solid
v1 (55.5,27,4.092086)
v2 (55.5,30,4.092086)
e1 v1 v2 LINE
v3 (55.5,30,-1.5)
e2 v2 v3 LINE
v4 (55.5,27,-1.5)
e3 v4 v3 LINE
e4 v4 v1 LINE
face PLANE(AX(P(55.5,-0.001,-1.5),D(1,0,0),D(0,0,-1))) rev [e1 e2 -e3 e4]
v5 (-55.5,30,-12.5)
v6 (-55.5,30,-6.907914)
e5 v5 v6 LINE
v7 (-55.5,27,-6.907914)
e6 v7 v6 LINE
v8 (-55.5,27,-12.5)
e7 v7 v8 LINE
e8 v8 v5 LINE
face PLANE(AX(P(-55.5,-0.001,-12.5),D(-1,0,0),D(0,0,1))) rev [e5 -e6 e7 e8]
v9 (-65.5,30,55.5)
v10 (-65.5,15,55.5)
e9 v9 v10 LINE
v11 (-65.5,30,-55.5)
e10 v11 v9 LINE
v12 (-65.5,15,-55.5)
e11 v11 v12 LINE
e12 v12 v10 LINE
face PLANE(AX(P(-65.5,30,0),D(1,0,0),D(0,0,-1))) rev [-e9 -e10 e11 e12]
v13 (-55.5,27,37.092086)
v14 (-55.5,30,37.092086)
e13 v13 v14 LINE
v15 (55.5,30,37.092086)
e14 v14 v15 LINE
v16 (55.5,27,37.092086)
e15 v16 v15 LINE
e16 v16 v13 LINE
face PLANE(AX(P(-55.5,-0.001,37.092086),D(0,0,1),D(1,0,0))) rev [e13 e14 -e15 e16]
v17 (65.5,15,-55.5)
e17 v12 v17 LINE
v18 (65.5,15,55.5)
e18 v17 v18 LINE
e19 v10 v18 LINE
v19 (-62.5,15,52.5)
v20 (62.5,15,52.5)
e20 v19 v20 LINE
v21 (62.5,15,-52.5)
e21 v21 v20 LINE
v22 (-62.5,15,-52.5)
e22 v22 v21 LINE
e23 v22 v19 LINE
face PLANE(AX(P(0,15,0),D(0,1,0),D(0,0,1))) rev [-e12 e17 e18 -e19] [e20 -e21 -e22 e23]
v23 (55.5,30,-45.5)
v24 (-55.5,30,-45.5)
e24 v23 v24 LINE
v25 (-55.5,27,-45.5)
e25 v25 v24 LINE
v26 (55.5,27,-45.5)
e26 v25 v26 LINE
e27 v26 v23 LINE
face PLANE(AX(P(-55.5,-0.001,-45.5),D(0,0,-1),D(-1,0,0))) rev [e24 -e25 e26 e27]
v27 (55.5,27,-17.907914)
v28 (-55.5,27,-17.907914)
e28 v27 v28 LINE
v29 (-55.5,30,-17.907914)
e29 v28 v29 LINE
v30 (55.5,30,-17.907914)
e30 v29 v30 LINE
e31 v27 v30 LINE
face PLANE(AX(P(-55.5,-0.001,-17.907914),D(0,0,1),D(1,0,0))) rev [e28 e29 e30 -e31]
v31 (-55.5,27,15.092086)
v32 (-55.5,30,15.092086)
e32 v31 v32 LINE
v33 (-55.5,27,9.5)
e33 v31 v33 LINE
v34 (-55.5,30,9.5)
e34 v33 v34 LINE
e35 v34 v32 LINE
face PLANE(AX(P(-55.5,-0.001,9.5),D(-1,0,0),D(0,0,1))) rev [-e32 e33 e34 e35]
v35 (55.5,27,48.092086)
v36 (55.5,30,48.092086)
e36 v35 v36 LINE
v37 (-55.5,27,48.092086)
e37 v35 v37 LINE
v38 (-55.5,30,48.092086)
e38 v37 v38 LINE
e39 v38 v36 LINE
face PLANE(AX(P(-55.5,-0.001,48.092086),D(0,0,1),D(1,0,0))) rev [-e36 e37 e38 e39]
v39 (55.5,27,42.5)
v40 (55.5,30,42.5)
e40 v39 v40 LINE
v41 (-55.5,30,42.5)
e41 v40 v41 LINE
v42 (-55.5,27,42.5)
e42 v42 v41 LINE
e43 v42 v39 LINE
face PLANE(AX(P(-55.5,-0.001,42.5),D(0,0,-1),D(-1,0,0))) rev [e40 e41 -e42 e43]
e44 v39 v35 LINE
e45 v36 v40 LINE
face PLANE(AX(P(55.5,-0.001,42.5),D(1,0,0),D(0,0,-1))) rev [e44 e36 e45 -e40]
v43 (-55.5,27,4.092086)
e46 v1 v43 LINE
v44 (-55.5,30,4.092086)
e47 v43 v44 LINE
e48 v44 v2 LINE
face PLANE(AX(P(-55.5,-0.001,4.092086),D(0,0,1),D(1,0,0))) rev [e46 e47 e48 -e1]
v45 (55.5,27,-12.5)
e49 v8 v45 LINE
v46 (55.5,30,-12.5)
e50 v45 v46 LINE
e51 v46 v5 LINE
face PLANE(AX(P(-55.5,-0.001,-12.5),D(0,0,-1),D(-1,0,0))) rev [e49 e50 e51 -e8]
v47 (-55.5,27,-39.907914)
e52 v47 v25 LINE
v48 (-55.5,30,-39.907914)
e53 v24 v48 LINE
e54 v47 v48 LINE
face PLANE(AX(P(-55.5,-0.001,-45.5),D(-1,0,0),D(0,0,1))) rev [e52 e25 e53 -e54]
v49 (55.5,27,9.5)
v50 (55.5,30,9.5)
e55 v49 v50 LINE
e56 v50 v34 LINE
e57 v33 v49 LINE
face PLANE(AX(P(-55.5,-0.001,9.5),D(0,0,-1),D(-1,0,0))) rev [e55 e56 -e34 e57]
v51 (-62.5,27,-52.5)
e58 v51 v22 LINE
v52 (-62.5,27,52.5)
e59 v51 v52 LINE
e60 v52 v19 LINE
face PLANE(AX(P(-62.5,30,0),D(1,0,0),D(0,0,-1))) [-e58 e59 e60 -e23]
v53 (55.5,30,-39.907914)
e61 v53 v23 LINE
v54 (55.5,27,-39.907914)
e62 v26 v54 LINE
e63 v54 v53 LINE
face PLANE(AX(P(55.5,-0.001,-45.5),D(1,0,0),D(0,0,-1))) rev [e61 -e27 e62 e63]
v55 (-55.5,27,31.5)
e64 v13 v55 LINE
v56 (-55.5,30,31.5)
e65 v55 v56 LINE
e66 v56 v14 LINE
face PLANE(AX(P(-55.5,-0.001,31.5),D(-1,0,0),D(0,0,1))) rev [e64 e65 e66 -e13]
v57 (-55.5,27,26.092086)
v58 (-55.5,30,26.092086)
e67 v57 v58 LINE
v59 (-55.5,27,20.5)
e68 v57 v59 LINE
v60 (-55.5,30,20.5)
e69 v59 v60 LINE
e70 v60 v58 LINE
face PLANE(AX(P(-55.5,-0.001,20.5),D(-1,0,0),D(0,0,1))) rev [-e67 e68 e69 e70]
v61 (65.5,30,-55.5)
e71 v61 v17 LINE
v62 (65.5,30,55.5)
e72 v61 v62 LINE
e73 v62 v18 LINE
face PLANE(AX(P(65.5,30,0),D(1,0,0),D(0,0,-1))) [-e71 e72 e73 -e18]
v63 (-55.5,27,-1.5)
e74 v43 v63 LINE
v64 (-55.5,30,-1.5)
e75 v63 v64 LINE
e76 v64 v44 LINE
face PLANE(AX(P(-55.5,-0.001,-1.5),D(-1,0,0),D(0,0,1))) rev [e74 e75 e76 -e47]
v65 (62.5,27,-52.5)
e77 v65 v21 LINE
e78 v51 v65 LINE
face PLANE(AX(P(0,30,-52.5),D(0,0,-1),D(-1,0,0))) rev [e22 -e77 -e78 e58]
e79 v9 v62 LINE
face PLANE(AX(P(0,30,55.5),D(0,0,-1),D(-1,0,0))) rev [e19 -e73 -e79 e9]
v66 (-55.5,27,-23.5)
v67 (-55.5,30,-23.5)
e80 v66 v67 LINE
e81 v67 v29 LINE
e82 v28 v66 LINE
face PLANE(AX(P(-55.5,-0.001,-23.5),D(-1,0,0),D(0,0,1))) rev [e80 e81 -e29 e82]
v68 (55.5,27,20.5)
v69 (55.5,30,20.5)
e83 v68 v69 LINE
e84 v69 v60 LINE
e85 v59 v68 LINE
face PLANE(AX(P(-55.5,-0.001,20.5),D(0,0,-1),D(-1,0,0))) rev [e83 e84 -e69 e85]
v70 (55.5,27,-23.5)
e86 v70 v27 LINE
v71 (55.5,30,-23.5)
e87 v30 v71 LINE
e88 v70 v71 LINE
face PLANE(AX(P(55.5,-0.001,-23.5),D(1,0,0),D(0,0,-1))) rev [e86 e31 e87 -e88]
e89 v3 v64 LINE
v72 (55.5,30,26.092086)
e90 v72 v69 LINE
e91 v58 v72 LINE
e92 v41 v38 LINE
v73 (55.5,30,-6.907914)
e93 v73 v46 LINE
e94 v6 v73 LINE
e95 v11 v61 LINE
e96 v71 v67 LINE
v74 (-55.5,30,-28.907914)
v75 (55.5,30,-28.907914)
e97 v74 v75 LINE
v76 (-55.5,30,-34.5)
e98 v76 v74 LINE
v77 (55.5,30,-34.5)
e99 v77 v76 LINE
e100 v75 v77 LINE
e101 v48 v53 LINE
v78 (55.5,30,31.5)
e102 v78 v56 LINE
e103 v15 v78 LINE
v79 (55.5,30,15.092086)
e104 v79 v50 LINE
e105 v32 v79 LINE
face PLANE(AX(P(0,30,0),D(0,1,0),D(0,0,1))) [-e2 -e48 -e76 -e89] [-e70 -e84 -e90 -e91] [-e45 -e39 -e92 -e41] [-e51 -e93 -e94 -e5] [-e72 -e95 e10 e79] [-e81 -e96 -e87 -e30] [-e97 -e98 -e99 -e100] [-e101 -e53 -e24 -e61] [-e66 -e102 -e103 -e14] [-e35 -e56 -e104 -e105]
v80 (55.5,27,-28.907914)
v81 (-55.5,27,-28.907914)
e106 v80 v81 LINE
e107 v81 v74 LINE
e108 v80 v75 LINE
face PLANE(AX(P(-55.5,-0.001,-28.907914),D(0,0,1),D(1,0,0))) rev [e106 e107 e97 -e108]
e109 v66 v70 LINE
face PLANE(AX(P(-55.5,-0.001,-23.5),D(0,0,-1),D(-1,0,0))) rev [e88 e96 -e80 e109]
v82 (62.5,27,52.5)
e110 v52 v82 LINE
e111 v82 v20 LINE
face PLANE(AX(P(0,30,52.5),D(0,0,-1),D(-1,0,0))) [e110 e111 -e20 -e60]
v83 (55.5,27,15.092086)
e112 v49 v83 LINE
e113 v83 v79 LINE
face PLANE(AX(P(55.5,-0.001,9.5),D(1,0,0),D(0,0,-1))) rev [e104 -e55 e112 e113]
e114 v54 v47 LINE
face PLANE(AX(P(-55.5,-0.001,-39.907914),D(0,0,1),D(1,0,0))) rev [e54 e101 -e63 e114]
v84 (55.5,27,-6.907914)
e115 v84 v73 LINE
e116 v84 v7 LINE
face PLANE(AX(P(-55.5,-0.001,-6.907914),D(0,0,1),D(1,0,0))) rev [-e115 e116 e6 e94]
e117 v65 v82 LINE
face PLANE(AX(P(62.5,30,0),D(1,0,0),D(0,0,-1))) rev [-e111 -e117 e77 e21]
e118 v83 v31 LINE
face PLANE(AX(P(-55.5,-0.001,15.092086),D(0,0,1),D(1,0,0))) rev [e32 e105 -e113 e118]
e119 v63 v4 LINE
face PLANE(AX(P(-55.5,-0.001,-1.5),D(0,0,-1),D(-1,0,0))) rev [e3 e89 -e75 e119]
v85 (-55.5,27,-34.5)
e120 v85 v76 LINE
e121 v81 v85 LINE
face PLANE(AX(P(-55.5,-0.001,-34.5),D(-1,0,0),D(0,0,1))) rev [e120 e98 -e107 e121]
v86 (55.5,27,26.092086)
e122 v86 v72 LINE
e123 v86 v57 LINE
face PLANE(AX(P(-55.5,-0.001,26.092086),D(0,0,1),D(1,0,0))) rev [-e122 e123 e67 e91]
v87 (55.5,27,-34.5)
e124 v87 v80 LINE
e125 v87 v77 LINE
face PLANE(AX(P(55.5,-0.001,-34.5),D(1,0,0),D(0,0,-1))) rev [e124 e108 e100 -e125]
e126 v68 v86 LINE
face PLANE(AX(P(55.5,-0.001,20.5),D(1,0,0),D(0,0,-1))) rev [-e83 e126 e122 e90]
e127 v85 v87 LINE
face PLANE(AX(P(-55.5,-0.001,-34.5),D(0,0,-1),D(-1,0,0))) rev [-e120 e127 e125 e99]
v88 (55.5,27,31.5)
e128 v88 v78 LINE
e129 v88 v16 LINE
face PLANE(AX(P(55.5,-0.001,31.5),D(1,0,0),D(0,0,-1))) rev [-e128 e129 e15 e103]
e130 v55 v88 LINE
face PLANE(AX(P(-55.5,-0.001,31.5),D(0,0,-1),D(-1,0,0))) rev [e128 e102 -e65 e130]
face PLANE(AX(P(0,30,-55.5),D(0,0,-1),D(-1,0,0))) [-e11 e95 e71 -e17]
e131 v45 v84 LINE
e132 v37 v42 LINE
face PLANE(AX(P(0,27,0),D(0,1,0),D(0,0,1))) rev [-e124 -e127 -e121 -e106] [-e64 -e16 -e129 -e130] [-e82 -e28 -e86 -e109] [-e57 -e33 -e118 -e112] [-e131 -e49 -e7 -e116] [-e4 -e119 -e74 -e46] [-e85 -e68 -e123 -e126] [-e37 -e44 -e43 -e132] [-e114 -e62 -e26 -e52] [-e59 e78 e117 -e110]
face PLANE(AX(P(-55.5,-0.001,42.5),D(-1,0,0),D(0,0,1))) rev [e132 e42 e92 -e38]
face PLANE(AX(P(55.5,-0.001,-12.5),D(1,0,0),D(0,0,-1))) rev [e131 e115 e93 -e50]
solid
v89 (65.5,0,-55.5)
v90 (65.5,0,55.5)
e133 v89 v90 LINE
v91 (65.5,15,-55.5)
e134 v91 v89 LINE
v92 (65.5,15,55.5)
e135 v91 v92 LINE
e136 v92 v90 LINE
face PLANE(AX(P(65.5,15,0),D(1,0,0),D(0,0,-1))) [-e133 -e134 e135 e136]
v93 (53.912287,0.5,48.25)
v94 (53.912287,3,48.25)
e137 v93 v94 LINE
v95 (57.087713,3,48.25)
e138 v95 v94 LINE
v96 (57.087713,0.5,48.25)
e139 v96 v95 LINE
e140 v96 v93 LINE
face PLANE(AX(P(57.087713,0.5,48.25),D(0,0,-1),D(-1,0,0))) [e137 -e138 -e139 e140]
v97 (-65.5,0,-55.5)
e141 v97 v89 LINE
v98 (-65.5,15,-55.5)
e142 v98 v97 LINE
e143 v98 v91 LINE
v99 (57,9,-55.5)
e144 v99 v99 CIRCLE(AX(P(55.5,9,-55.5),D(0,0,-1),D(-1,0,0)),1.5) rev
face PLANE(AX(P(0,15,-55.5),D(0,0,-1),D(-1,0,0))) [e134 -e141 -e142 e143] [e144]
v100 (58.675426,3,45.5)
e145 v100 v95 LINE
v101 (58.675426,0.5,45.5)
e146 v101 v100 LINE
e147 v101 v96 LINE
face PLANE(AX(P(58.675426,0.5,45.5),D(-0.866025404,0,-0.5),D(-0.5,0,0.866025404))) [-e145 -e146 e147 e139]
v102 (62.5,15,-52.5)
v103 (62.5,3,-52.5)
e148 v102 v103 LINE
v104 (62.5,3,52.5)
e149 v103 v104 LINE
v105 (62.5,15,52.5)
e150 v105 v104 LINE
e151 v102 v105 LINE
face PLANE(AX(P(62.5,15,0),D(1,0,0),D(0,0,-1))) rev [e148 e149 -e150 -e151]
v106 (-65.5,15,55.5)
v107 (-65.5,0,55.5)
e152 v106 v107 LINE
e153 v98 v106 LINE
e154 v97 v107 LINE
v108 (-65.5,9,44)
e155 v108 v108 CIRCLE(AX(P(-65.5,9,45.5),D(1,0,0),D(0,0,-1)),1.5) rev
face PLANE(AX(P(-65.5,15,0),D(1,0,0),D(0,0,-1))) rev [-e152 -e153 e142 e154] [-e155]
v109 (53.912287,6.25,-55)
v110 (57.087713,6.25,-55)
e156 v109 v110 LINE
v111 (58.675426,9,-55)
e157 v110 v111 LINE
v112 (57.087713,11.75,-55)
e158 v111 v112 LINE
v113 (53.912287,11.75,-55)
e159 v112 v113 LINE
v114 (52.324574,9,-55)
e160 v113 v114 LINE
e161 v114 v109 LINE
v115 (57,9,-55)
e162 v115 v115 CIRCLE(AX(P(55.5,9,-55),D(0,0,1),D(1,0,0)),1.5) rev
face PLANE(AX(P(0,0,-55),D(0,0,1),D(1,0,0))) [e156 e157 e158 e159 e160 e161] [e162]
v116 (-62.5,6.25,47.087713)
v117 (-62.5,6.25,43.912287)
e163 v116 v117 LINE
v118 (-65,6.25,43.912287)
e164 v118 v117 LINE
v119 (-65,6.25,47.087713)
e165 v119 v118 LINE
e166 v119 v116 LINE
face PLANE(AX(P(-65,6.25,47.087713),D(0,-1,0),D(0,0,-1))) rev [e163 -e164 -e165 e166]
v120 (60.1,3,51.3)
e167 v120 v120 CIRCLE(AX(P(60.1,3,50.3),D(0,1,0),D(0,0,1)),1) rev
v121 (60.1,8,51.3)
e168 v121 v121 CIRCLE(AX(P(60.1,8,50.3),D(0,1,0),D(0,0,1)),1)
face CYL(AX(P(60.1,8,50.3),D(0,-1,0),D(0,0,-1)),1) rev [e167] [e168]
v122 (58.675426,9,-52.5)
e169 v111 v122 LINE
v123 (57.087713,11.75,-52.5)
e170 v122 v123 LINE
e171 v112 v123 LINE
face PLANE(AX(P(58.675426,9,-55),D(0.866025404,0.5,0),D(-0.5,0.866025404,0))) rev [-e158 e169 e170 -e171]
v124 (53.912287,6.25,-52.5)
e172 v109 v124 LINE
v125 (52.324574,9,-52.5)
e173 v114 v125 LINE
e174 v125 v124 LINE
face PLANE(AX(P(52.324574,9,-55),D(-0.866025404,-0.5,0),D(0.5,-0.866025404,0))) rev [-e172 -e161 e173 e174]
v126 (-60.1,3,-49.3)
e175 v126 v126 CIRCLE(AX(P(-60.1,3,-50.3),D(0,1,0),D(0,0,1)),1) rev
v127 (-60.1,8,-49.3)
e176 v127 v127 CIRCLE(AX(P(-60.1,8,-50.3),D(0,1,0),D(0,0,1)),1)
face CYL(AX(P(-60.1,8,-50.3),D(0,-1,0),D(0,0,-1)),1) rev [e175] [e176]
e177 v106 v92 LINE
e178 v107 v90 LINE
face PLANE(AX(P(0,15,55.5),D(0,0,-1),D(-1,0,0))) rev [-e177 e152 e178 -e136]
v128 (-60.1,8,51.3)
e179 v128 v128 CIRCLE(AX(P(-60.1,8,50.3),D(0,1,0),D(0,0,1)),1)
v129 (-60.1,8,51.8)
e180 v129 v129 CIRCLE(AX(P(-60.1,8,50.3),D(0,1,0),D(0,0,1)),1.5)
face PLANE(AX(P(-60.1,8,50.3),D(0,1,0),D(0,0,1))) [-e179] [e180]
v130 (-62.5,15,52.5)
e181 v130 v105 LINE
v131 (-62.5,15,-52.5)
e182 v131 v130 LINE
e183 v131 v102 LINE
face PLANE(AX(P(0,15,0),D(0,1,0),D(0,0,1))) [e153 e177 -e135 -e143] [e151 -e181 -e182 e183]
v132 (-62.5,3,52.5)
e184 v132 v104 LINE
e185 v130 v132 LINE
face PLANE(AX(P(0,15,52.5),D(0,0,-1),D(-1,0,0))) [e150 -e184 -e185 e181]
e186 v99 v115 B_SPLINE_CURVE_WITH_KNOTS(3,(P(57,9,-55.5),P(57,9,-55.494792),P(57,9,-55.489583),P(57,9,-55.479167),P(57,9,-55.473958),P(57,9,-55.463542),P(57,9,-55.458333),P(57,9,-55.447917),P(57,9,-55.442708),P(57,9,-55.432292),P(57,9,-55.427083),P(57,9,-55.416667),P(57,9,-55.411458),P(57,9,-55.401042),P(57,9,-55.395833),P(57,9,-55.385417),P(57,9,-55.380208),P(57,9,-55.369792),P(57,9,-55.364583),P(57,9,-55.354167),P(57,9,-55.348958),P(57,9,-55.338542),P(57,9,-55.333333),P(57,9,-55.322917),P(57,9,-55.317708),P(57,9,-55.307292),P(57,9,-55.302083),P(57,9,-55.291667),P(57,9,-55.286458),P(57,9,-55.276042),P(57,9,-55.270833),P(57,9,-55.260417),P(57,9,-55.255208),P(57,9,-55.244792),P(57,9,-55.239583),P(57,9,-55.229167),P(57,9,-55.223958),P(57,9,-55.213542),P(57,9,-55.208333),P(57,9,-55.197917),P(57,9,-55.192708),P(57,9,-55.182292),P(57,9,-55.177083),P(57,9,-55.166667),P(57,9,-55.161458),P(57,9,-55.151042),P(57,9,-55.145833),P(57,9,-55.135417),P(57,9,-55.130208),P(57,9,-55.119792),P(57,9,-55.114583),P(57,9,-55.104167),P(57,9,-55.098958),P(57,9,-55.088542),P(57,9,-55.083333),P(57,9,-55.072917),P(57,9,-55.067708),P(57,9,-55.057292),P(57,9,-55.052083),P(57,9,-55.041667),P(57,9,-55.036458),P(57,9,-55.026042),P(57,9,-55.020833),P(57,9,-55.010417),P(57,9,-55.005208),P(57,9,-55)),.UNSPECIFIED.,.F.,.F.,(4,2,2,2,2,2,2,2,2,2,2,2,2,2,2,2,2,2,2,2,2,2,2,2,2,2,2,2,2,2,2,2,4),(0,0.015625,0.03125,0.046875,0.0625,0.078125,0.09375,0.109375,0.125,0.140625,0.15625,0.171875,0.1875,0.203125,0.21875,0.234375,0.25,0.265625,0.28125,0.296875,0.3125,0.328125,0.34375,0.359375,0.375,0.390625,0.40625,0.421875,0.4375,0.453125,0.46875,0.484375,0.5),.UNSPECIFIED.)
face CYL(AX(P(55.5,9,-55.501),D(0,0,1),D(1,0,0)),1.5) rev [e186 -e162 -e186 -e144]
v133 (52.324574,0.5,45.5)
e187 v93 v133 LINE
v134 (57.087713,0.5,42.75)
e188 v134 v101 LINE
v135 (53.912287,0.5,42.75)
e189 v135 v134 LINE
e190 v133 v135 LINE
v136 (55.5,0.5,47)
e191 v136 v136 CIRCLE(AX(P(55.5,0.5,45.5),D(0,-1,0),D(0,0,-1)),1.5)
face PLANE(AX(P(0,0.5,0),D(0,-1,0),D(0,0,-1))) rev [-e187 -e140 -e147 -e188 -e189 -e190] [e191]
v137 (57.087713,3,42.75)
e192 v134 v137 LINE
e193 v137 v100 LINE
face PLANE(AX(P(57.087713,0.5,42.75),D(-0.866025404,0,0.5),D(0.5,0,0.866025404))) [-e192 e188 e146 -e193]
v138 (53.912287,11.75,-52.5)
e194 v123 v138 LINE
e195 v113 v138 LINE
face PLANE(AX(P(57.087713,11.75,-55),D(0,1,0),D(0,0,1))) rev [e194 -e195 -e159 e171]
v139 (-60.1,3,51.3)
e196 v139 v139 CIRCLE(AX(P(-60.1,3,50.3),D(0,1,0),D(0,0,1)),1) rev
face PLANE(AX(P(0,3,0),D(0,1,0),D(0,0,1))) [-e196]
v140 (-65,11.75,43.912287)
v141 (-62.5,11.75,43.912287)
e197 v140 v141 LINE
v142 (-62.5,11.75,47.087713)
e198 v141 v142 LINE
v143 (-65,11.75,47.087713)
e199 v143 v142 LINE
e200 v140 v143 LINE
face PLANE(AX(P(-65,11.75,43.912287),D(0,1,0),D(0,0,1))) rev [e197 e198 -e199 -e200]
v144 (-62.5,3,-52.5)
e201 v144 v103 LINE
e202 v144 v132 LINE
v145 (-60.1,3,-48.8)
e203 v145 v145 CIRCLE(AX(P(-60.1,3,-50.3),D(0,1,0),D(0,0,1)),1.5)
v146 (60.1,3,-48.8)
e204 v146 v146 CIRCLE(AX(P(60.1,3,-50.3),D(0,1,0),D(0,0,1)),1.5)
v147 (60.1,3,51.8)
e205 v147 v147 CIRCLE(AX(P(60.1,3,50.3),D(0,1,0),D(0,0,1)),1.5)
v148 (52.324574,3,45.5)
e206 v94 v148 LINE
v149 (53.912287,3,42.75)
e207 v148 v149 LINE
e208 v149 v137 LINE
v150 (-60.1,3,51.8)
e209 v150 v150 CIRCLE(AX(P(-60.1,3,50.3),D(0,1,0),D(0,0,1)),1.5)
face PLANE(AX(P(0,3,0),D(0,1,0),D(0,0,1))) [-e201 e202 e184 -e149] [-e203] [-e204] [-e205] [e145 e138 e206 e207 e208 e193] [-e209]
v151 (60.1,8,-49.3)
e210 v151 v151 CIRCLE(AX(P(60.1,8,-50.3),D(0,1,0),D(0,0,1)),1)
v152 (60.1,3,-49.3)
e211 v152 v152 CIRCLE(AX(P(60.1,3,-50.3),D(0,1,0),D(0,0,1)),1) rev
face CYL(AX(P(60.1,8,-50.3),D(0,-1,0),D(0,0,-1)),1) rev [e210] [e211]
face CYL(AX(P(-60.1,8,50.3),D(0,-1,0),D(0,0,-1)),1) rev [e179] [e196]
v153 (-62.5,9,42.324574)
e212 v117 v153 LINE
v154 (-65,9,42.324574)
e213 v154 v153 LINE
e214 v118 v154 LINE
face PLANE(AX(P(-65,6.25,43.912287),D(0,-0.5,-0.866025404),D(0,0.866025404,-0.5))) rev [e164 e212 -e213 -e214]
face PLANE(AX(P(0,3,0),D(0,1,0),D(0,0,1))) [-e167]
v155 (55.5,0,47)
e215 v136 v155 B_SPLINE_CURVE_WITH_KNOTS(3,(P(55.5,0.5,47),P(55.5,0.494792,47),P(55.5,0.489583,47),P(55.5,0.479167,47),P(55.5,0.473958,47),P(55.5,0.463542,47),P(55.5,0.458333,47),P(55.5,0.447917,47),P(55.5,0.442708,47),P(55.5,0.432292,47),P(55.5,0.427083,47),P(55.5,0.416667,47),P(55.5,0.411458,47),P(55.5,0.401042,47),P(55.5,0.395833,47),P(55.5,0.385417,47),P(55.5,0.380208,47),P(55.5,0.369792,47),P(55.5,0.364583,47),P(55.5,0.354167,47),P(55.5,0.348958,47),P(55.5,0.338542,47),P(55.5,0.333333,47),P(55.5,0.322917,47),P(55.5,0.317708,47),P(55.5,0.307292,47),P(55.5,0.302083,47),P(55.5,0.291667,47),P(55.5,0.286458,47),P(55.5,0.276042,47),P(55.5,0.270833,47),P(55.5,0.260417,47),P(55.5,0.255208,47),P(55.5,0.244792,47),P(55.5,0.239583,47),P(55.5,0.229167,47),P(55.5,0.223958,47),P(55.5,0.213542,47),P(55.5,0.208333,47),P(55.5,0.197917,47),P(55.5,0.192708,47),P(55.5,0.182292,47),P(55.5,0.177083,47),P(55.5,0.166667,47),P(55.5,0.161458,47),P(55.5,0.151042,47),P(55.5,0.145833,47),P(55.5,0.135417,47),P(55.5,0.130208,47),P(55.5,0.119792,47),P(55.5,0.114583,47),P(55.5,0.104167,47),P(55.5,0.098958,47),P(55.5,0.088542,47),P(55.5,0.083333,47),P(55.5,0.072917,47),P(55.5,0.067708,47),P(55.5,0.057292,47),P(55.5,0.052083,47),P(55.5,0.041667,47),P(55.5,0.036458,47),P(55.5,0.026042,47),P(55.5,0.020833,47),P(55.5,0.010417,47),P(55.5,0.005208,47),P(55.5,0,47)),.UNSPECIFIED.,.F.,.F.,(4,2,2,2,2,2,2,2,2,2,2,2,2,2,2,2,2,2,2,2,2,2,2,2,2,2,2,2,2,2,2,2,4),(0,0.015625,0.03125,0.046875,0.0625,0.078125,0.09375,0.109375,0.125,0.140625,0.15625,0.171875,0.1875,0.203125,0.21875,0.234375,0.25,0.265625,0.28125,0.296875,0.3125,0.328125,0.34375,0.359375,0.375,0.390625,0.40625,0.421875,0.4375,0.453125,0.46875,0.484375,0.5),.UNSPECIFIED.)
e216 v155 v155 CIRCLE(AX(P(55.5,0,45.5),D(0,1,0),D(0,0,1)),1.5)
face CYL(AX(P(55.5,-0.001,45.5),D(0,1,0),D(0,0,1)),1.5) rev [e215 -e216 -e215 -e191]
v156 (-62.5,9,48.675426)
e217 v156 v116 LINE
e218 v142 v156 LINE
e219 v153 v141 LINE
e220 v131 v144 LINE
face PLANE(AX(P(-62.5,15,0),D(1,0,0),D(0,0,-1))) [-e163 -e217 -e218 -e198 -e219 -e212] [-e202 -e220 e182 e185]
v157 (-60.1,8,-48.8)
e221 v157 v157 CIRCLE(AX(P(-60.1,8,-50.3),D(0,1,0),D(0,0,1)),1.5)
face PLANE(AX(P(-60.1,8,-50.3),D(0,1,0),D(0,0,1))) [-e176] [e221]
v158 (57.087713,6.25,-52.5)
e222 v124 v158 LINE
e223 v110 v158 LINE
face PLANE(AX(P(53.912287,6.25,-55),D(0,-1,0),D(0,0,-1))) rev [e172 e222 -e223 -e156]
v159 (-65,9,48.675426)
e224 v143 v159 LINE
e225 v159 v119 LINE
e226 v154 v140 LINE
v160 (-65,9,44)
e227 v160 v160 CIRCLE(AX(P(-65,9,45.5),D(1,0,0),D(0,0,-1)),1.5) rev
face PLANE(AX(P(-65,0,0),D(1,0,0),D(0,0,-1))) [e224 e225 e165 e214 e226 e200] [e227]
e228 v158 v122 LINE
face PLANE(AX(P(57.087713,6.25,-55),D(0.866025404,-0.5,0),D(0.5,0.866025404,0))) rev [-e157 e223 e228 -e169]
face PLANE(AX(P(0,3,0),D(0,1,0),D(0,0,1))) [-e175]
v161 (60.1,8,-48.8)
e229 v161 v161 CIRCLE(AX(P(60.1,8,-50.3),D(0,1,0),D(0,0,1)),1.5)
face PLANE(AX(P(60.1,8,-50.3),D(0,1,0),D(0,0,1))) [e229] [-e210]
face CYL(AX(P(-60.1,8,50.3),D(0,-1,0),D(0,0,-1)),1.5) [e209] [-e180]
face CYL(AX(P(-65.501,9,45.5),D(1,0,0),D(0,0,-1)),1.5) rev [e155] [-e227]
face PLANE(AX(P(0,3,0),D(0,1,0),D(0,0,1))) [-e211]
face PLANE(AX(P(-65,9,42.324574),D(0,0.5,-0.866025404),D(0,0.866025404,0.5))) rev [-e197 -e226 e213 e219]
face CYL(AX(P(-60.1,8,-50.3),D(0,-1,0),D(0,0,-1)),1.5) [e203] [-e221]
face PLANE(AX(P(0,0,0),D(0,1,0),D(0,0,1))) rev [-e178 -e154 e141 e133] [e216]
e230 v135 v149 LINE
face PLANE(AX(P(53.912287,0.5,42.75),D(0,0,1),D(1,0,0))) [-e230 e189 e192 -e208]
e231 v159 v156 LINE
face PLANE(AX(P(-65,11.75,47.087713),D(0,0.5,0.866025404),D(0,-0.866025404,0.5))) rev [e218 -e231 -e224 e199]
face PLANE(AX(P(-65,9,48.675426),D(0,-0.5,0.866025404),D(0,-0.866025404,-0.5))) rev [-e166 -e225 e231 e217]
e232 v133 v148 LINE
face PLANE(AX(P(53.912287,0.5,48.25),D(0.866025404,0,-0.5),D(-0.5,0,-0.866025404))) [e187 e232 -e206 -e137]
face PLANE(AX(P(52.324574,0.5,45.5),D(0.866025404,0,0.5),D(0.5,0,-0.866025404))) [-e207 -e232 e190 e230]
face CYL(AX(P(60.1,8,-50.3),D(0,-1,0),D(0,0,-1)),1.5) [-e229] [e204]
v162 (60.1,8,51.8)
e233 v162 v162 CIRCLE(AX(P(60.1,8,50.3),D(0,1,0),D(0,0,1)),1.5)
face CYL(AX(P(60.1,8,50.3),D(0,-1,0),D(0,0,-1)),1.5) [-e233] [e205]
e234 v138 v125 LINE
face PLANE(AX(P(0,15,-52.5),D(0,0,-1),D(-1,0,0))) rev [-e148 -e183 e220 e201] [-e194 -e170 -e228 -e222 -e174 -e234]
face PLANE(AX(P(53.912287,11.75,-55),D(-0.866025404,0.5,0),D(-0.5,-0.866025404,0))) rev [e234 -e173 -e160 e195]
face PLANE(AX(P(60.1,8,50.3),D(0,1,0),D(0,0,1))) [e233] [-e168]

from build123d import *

# Parameters (mm, degrees)
ESBO_O1_W                    = 131
ESBO_O1_H                    = 111
ESBO_O1_W_2                  = 125
ESBO_O1_H_2                  = 105
RESSALTO_EXTRUS_O1_DEPTH     = 15
ESBO_O1_4_W                  = 125
ESBO_O1_4_H                  = 105
RESSALTO_EXTRUS_O4_DEPTH     = 3
ESBO_O2_R                    = 1.5
ESBO_O2_R_2                  = 1
RESSALTO_EXTRUS_O8_DEPTH     = 5
CORTE_EXTRUS_O4_DEPTH        = 2.5
CORTE_EXTRUS_O5_REACH        = 142.318
ESBO_O5_5_R                  = 1.5
CORTE_EXTRUS_O6_DEPTH        = 2.5
CORTE_EXTRUS_O7_REACH        = 129.198
ESBO_O8_7_R                  = 1.5
CORTE_EXTRUS_O9_DEPTH        = 2.5
CORTE_EXTRUS_O10_REACH       = 88.686
ESBO_O9_7_R                  = 1.5
RESSALTO_EXTRUS_O6_START     = 15
ESBO_O1_6_W                  = 131
ESBO_O1_6_H                  = 111
ESBO_O1_6_W_2                = 125
ESBO_O1_6_H_2                = 105
RESSALTO_EXTRUS_O6_DEPTH     = 15
RESSALTO_EXTRUS_O7_START     = 27
RESSALTO_EXTRUS_O7_OUTLINE_W = 125
RESSALTO_EXTRUS_O7_OUTLINE_H = 105
RESSALTO_EXTRUS_O7_DEPTH     = 3
ESBO_O3_W                    = 111
ESBO_O3_H                    = 5.592085676
CORTE_EXTRUS_O1_DEPTH        = 3


# Read off the part's stored shape, not the designer's step: Ressalto-extrusão7
with BuildPart() as part:
    # Esboço1 → Ressalto-extrusão1 (new body)
    with BuildSketch(Plane(origin=(0, 0, 0), x_dir=(1, 0, 0), z_dir=(0, 1, 0))):
        Rectangle(ESBO_O1_W, ESBO_O1_H)
        Rectangle(ESBO_O1_W_2, ESBO_O1_H_2, mode=Mode.SUBTRACT)
    extrude(amount=RESSALTO_EXTRUS_O1_DEPTH)

    # Esboço1<4> → Ressalto-extrusão4 (add)
    with BuildSketch(Plane(origin=(0, 0, 0), x_dir=(1, 0, 0), z_dir=(0, 1, 0))):
        Rectangle(ESBO_O1_4_W, ESBO_O1_4_H)
    extrude(amount=RESSALTO_EXTRUS_O4_DEPTH)

    # Esboço2 → Ressalto-extrusão8 (add)
    # profile 1 of 4: a face of its own
    with BuildSketch(Plane(origin=(0, 3, 0), x_dir=(1, 0, 0), z_dir=(0, 1, 0))):
        with Locations(Location((-60.1, 50.3, 0), (0, 0, 270))):
            Circle(ESBO_O2_R)
        with Locations(Location((-60.1, 50.3, 0), (0, 0, 270))):
            Circle(ESBO_O2_R_2, mode=Mode.SUBTRACT)
    # profile 2 of 4: a face of its own
    with BuildSketch(Plane(origin=(0, 3, 0), x_dir=(1, 0, 0), z_dir=(0, 1, 0))):
        with Locations(Location((60.1, 50.3, 0), (0, 0, 270))):
            Circle(ESBO_O2_R)
        with Locations(Location((60.1, 50.3, 0), (0, 0, 270))):
            Circle(ESBO_O2_R_2, mode=Mode.SUBTRACT)
    # profile 3 of 4: a face of its own
    with BuildSketch(Plane(origin=(0, 3, 0), x_dir=(1, 0, 0), z_dir=(0, 1, 0))):
        with Locations(Location((-60.1, -50.3, 0), (0, 0, 270))):
            Circle(ESBO_O2_R)
        with Locations(Location((-60.1, -50.3, 0), (0, 0, 270))):
            Circle(ESBO_O2_R_2, mode=Mode.SUBTRACT)
    # profile 4 of 4: a face of its own
    with BuildSketch(Plane(origin=(0, 3, 0), x_dir=(1, 0, 0), z_dir=(0, 1, 0))):
        with Locations(Location((60.1, -50.3, 0), (0, 0, 270))):
            Circle(ESBO_O2_R)
        with Locations(Location((60.1, -50.3, 0), (0, 0, 270))):
            Circle(ESBO_O2_R_2, mode=Mode.SUBTRACT)
    extrude(amount=RESSALTO_EXTRUS_O8_DEPTH)

    # Esboço5 → Corte-extrusão4 (cut)
    with BuildSketch(Plane(origin=(-62.5, 0, 0), x_dir=(0, 0, -1), z_dir=(1, 0, 0))):
        Polygon((-43.91228676, 6.25), (-42.324573519, 9), (-43.91228676, 11.75), (-47.08771324, 11.75), (-48.675426481, 9), (-47.08771324, 6.25), align=None)
    extrude(amount=-CORTE_EXTRUS_O4_DEPTH, mode=Mode.SUBTRACT)

    # Esboço5<5> → Corte-extrusão5 (cut, up to next)
    with BuildSketch(Plane(origin=(-62.5, 0, 0), x_dir=(0, 0, -1), z_dir=(1, 0, 0)), mode=Mode.PRIVATE) as corte_extrus_o5_sk1:
        with Locations((-45.5, 9)):
            Circle(ESBO_O5_5_R)
    corte_extrus_o5_tool1 = extrude(corte_extrus_o5_sk1.sketch, amount=-CORTE_EXTRUS_O5_REACH, mode=Mode.PRIVATE) & part.part
    add(corte_extrus_o5_tool1.solids().sort_by_distance((-62.5, 9, 45.5))[0], mode=Mode.SUBTRACT)

    # Esboço8 → Corte-extrusão6 (cut)
    with BuildSketch(Plane.XY.offset(-52.5)):
        Polygon((57.08771324, 6.25), (58.675426481, 9), (57.08771324, 11.75), (53.91228676, 11.75), (52.324573519, 9), (53.91228676, 6.25), align=None)
    extrude(amount=-CORTE_EXTRUS_O6_DEPTH, mode=Mode.SUBTRACT)

    # Esboço8<7> → Corte-extrusão7 (cut, up to next)
    with BuildSketch(Plane.XY.offset(-52.5), mode=Mode.PRIVATE) as corte_extrus_o7_sk1:
        with Locations((55.5, 9)):
            Circle(ESBO_O8_7_R)
    corte_extrus_o7_tool1 = extrude(corte_extrus_o7_sk1.sketch, amount=-CORTE_EXTRUS_O7_REACH, mode=Mode.PRIVATE) & part.part
    add(corte_extrus_o7_tool1.solids().sort_by_distance((55.5, 9, -52.5))[0], mode=Mode.SUBTRACT)

    # Esboço9 → Corte-extrusão9 (cut)
    with BuildSketch(Plane(origin=(0, 3, 0), x_dir=(-1, 0, 0), z_dir=(0, -1, 0))):
        Polygon((-53.91228676, -48.25), (-52.324573519, -45.5), (-53.91228676, -42.75), (-57.08771324, -42.75), (-58.675426481, -45.5), (-57.08771324, -48.25), align=None)
    extrude(amount=CORTE_EXTRUS_O9_DEPTH, mode=Mode.SUBTRACT)

    # Esboço9<7> → Corte-extrusão10 (cut, up to next)
    with BuildSketch(Plane(origin=(0, 3, 0), x_dir=(-1, 0, 0), z_dir=(0, -1, 0)), mode=Mode.PRIVATE) as corte_extrus_o10_sk1:
        with Locations(Location((-55.5, -45.5, 0), (0, 0, 270))):
            Circle(ESBO_O9_7_R)
    corte_extrus_o10_tool1 = extrude(corte_extrus_o10_sk1.sketch, amount=CORTE_EXTRUS_O10_REACH, mode=Mode.PRIVATE) & part.part
    add(corte_extrus_o10_tool1.solids().sort_by_distance((55.5, 3, 45.5))[0], mode=Mode.SUBTRACT)


with BuildPart() as body_2:
    # Esboço1<6> → Ressalto-extrusão6 (new body)
    with BuildSketch(Plane(origin=(0, 0, 0), x_dir=(1, 0, 0), z_dir=(0, 1, 0)).offset(RESSALTO_EXTRUS_O6_START)):
        Rectangle(ESBO_O1_6_W, ESBO_O1_6_H)
        Rectangle(ESBO_O1_6_W_2, ESBO_O1_6_H_2, mode=Mode.SUBTRACT)
    extrude(amount=RESSALTO_EXTRUS_O6_DEPTH)

    # Ressalto-extrusão7 outline → Ressalto-extrusão7 (add)
    with BuildSketch(Plane(origin=(0, 0, 0), x_dir=(1, 0, 0), z_dir=(0, 1, 0)).offset(RESSALTO_EXTRUS_O7_START)):
        Rectangle(RESSALTO_EXTRUS_O7_OUTLINE_W, RESSALTO_EXTRUS_O7_OUTLINE_H)
    extrude(amount=RESSALTO_EXTRUS_O7_DEPTH)

    # Esboço3 → Corte-extrusão1 (cut)
    with BuildSketch(Plane(origin=(0, 30, 0), x_dir=(1, 0, 0), z_dir=(0, 1, 0))):
        with Locations((0, 42.703957162)):
            Rectangle(ESBO_O3_W, ESBO_O3_H)
        with Locations((0, 31.703957162)):
            Rectangle(ESBO_O3_W, ESBO_O3_H)
        with Locations((0, 20.703957162)):
            Rectangle(ESBO_O3_W, ESBO_O3_H)
        with Locations((0, 9.703957162)):
            Rectangle(ESBO_O3_W, ESBO_O3_H)
        with Locations((0, -1.296042838)):
            Rectangle(ESBO_O3_W, ESBO_O3_H)
        with Locations((0, -12.296042838)):
            Rectangle(ESBO_O3_W, ESBO_O3_H)
        with Locations((0, -23.296042838)):
            Rectangle(ESBO_O3_W, ESBO_O3_H)
        with Locations((0, -34.296042838)):
            Rectangle(ESBO_O3_W, ESBO_O3_H)
        with Locations((0, -45.296042838)):
            Rectangle(ESBO_O3_W, ESBO_O3_H)
    extrude(amount=-CORTE_EXTRUS_O1_DEPTH, mode=Mode.SUBTRACT)


solid = Compound([part.part, body_2.part])
